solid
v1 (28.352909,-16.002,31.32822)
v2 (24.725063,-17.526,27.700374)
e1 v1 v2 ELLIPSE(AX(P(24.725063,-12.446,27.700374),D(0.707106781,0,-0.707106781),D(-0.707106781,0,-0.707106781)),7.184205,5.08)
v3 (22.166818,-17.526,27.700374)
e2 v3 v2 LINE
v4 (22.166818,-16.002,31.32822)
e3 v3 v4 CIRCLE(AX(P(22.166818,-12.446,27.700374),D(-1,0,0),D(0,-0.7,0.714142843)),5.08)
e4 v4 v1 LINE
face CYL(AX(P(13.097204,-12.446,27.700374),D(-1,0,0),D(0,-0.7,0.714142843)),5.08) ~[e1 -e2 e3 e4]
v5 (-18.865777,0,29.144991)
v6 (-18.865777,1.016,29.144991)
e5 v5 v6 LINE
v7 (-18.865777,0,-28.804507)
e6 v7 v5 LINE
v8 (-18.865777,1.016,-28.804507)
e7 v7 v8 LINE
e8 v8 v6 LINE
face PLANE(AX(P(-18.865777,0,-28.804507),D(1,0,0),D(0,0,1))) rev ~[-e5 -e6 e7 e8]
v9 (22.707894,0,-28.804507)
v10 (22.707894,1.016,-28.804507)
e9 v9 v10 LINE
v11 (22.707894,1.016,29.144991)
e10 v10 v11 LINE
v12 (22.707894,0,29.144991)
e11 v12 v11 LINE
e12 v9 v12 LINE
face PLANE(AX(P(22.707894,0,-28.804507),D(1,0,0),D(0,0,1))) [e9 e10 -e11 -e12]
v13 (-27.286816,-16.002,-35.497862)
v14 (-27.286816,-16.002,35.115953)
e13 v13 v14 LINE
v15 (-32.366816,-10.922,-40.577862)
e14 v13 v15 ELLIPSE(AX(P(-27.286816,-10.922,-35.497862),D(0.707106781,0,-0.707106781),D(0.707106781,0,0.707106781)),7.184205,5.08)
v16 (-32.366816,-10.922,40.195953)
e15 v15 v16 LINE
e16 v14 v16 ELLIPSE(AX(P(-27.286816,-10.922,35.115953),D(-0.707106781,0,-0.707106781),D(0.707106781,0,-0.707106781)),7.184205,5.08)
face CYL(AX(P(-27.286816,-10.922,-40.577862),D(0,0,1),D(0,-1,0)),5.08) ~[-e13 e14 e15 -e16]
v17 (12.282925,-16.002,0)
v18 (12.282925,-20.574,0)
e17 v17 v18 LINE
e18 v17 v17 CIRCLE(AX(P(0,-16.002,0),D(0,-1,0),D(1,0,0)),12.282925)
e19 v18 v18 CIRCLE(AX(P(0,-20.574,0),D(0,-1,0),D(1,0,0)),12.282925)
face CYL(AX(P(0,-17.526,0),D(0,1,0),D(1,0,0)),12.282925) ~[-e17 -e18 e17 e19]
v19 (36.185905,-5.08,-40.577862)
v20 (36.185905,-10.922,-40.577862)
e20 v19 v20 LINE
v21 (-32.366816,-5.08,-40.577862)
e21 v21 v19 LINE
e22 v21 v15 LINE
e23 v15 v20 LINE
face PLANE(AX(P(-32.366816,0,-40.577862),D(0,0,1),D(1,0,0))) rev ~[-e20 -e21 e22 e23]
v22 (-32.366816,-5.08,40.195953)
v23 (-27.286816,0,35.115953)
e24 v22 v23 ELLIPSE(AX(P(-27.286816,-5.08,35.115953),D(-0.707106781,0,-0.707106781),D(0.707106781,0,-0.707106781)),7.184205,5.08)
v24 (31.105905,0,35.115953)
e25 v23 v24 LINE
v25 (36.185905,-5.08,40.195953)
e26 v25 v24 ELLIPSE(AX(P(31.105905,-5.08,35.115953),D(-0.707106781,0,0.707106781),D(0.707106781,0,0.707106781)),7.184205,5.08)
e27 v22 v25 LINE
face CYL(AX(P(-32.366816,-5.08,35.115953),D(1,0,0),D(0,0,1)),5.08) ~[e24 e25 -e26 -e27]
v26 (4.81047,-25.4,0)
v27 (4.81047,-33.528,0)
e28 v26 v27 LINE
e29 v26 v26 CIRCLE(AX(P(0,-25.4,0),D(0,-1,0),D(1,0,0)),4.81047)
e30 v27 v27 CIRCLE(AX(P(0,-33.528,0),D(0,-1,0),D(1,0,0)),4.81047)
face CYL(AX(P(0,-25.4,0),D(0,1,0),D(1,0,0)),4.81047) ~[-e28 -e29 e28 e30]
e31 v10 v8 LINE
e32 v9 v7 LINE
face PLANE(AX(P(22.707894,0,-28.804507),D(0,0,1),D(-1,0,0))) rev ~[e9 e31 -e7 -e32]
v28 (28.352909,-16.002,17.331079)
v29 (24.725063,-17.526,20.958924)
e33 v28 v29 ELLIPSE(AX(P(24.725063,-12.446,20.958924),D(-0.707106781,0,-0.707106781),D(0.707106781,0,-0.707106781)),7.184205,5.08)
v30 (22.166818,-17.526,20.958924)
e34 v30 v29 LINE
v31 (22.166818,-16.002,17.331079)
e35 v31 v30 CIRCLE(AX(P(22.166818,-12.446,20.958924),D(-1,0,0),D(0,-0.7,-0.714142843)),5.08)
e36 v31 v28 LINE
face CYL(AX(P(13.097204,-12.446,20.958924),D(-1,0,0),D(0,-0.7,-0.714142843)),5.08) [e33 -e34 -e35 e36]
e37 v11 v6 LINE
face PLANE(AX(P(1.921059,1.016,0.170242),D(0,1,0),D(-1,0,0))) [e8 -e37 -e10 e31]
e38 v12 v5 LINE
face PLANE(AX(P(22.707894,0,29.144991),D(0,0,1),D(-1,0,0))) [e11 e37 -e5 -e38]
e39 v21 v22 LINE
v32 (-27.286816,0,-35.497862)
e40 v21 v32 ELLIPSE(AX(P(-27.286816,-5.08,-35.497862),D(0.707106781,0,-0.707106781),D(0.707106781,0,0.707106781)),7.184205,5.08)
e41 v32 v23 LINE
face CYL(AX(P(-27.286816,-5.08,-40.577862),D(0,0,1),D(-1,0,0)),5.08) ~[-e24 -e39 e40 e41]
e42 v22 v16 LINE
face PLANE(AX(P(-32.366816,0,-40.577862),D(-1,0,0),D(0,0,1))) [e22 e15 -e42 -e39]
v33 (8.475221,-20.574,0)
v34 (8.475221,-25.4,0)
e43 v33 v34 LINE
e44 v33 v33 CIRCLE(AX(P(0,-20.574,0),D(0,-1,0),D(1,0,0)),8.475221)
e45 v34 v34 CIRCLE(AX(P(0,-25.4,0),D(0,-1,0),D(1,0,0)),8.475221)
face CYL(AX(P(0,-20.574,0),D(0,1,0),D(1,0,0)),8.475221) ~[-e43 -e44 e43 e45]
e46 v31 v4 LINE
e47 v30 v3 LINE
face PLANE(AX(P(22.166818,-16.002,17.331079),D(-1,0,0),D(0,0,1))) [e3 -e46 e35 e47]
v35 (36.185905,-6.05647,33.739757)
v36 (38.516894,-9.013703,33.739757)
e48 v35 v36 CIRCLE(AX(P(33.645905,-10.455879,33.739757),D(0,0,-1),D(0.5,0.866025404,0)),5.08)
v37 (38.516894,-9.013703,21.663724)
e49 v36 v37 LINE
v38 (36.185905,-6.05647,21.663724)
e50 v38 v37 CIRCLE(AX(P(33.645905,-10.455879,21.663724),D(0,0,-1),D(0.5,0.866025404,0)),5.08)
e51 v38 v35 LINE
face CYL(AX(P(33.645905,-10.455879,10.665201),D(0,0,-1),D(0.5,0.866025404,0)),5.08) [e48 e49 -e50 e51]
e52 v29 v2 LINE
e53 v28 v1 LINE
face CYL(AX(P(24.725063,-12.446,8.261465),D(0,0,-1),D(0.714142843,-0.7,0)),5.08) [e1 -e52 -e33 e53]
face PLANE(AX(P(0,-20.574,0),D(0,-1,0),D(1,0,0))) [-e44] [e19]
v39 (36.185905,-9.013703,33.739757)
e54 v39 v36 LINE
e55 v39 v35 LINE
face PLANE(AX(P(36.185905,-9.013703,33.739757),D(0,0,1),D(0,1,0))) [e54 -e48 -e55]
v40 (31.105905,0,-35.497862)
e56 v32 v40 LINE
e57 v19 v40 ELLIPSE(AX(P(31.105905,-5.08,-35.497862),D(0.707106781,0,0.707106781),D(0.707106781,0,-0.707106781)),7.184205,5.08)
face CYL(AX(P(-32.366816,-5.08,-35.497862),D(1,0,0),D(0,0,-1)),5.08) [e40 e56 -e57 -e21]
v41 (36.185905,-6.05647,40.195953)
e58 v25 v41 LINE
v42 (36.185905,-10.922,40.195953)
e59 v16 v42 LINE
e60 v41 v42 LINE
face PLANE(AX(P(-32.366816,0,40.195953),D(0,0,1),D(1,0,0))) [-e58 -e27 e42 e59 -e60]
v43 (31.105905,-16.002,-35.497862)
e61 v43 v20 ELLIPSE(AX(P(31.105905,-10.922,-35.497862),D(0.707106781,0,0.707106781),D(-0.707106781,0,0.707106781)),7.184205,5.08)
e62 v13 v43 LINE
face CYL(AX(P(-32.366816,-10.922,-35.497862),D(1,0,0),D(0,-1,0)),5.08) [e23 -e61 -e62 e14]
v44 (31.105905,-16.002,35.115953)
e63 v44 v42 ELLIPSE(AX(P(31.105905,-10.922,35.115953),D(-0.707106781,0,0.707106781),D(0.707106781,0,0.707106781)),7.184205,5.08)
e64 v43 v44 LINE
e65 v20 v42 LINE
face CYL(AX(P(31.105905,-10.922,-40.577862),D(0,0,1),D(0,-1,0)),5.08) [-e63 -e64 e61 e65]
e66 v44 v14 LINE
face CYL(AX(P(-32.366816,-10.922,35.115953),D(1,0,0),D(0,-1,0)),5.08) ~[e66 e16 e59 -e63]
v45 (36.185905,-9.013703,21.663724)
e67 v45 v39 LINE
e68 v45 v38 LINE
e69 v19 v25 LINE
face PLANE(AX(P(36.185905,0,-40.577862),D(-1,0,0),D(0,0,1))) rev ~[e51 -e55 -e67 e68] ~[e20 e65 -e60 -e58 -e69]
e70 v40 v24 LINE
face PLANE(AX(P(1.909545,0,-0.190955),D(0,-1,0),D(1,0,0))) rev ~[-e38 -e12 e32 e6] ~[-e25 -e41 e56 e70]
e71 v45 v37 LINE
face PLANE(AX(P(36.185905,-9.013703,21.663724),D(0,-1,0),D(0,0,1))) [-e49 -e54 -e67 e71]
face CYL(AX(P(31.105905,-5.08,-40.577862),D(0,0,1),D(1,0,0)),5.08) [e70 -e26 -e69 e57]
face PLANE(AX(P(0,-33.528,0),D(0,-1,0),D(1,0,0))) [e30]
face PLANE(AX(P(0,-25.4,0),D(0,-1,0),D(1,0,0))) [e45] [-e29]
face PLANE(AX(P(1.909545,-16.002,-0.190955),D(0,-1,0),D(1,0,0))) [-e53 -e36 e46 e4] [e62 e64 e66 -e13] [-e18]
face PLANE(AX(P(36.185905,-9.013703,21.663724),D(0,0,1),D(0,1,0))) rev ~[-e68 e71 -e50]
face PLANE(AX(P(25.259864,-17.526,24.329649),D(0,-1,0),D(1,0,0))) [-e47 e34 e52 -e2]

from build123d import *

# Parameters (mm, degrees)
F0_W         = 68.5527212918
F0_H         = 80.7738155127
F1_DEPTH     = 16.002
F2_R         = 12.2829248395
F2_W         = 6.1860904098
F2_H         = 13.9971412718
F4_DEPTH     = 1.524
F5_DEPTH     = 3.048
F3_W         = 2.9572332278
F3_H         = 12.0760332793
F6_DEPTH     = 2.54
F7_T1_DEPTH  = 34.0730785354
F8_R         = 8.4752207388
F9_DEPTH     = 4.826
F10_R        = 4.8104699567
F11_DEPTH    = 8.128
F12_R        = 5.08
F13_T1_DEPTH = 32.1363694803
F13_T3_DEPTH = 24.3253186183
F14_W        = 41.5736716241
F14_H        = 57.9494982958
F15_DEPTH    = 1.016


# Not quite as in the source:
# - a fillet or chamfer that OpenCascade refuses, or shapes differently, is made with other operations: its cross-section is extruded or revolved along the edge and cut away or added


with BuildPart() as f1:
    # F0 (on Front) → F1 (new body)
    with BuildSketch(Plane.XZ):
        with Locations((1.9095446914, -0.1909546554)):
            Rectangle(F0_W, F0_H)
    extrude(amount=F1_DEPTH)

    # F2 (on face) → F4 (join)
    with BuildSketch(Plane.XZ.offset(16.002)):
        Circle(F2_R)
        with Locations((25.2598635852, 24.3296492845)):
            Rectangle(F2_W, F2_H)
    extrude(amount=F4_DEPTH)

    # F5 (add): a face of the model
    f5_faces = [f1.faces().sort_by_distance(p)[0] for p in [
        (0, -17.526, 0),
    ]]
    extrude(f5_faces, amount=F5_DEPTH)

    # F3 (on face) → F6 (join)
    with BuildSketch(Plane.YZ.offset(36.1859053373)):
        with Locations((-7.535086479, 27.7017401531)):
            Rectangle(F3_W, F3_H)
    extrude(amount=F6_DEPTH)

    # F7: fillet of radius 5.08 on 1 edges, made by hand

    # F7_s2 → F7_t1 (cut)
    with BuildSketch(Plane.XY.offset(10.6652008854)):
        with BuildLine():
            ThreePointArc((36.1859053373, -6.0564698651), (38.0453143886, -7.9158789164), (38.7259053373, -10.4558789164))
            Line((38.7259053373, -10.4558789164), (38.7259053373, -6.0564698651))
            Line((38.7259053373, -6.0564698651), (36.1859053373, -6.0564698651))
        make_face()
    extrude(amount=F7_T1_DEPTH, mode=Mode.SUBTRACT)

    # F8 (on face) → F9 (join)
    with BuildSketch(Plane.XZ.offset(20.574)):
        Circle(F8_R)
    extrude(amount=F9_DEPTH)

    # F10 (on face) → F11 (join)
    with BuildSketch(Plane.XZ.offset(25.4)):
        Circle(F10_R)
    extrude(amount=F11_DEPTH)

    # F12
    f12_edges = [f1.edges().sort_by_distance(p)[0] for p in [
        (36.185905, -16.002, -0.190955),
        (1.909545, -16.002, 40.195953),
        (1.909545, -16.002, -40.577862),
        (-32.366816, -16.002, -0.190955),
        (1.909545, 0, -40.577862),
        (36.185905, 0, -0.190955),
        (1.909545, 0, 40.195953),
        (-32.366816, 0, -0.190955),
    ]]
    fillet(f12_edges, radius=F12_R)

    # F13: fillet of radius 5.08 on 3 edges, made by hand

    # F13_s2 → F13_t1 (cut)
    with BuildSketch(Plane.XY.offset(8.2614645443)):
        with BuildLine():
            ThreePointArc((28.3529087901, -16.002), (26.6925386883, -17.1295285843), (24.7250631484, -17.526))
            Line((24.7250631484, -17.526), (28.3529087901, -17.526))
            Line((28.3529087901, -17.526), (28.3529087901, -16.002))
        make_face()
    extrude(amount=F13_T1_DEPTH, mode=Mode.SUBTRACT)

    # F13_s4 → F13_t3 (cut)
    with BuildSketch(Plane.YZ.offset(13.0972042761)):
        with BuildLine():
            ThreePointArc((-16.002, 31.3282199204), (-17.1295285843, 29.6678498186), (-17.526, 27.7003742787))
            Line((-17.526, 27.7003742787), (-17.526, 31.3282199204))
            Line((-17.526, 31.3282199204), (-16.002, 31.3282199204))
        make_face()
        with BuildLine():
            ThreePointArc((-16.002, 17.3310786486), (-17.1295285843, 18.9914487504), (-17.526, 20.9589242903))
            Line((-17.526, 20.9589242903), (-17.526, 17.3310786486))
            Line((-17.526, 17.3310786486), (-16.002, 17.3310786486))
        make_face()
    extrude(amount=F13_T3_DEPTH, mode=Mode.SUBTRACT)

    # F14 (on face) → F15 (join)
    with BuildSketch(Plane(origin=(0, 0, 0), x_dir=(-1, 0, 0), z_dir=(0, 1, 0))):
        with Locations((-1.9210586324, 0.1702420413)):
            Rectangle(F14_W, F14_H)
    extrude(amount=F15_DEPTH)


solid = f1.part
